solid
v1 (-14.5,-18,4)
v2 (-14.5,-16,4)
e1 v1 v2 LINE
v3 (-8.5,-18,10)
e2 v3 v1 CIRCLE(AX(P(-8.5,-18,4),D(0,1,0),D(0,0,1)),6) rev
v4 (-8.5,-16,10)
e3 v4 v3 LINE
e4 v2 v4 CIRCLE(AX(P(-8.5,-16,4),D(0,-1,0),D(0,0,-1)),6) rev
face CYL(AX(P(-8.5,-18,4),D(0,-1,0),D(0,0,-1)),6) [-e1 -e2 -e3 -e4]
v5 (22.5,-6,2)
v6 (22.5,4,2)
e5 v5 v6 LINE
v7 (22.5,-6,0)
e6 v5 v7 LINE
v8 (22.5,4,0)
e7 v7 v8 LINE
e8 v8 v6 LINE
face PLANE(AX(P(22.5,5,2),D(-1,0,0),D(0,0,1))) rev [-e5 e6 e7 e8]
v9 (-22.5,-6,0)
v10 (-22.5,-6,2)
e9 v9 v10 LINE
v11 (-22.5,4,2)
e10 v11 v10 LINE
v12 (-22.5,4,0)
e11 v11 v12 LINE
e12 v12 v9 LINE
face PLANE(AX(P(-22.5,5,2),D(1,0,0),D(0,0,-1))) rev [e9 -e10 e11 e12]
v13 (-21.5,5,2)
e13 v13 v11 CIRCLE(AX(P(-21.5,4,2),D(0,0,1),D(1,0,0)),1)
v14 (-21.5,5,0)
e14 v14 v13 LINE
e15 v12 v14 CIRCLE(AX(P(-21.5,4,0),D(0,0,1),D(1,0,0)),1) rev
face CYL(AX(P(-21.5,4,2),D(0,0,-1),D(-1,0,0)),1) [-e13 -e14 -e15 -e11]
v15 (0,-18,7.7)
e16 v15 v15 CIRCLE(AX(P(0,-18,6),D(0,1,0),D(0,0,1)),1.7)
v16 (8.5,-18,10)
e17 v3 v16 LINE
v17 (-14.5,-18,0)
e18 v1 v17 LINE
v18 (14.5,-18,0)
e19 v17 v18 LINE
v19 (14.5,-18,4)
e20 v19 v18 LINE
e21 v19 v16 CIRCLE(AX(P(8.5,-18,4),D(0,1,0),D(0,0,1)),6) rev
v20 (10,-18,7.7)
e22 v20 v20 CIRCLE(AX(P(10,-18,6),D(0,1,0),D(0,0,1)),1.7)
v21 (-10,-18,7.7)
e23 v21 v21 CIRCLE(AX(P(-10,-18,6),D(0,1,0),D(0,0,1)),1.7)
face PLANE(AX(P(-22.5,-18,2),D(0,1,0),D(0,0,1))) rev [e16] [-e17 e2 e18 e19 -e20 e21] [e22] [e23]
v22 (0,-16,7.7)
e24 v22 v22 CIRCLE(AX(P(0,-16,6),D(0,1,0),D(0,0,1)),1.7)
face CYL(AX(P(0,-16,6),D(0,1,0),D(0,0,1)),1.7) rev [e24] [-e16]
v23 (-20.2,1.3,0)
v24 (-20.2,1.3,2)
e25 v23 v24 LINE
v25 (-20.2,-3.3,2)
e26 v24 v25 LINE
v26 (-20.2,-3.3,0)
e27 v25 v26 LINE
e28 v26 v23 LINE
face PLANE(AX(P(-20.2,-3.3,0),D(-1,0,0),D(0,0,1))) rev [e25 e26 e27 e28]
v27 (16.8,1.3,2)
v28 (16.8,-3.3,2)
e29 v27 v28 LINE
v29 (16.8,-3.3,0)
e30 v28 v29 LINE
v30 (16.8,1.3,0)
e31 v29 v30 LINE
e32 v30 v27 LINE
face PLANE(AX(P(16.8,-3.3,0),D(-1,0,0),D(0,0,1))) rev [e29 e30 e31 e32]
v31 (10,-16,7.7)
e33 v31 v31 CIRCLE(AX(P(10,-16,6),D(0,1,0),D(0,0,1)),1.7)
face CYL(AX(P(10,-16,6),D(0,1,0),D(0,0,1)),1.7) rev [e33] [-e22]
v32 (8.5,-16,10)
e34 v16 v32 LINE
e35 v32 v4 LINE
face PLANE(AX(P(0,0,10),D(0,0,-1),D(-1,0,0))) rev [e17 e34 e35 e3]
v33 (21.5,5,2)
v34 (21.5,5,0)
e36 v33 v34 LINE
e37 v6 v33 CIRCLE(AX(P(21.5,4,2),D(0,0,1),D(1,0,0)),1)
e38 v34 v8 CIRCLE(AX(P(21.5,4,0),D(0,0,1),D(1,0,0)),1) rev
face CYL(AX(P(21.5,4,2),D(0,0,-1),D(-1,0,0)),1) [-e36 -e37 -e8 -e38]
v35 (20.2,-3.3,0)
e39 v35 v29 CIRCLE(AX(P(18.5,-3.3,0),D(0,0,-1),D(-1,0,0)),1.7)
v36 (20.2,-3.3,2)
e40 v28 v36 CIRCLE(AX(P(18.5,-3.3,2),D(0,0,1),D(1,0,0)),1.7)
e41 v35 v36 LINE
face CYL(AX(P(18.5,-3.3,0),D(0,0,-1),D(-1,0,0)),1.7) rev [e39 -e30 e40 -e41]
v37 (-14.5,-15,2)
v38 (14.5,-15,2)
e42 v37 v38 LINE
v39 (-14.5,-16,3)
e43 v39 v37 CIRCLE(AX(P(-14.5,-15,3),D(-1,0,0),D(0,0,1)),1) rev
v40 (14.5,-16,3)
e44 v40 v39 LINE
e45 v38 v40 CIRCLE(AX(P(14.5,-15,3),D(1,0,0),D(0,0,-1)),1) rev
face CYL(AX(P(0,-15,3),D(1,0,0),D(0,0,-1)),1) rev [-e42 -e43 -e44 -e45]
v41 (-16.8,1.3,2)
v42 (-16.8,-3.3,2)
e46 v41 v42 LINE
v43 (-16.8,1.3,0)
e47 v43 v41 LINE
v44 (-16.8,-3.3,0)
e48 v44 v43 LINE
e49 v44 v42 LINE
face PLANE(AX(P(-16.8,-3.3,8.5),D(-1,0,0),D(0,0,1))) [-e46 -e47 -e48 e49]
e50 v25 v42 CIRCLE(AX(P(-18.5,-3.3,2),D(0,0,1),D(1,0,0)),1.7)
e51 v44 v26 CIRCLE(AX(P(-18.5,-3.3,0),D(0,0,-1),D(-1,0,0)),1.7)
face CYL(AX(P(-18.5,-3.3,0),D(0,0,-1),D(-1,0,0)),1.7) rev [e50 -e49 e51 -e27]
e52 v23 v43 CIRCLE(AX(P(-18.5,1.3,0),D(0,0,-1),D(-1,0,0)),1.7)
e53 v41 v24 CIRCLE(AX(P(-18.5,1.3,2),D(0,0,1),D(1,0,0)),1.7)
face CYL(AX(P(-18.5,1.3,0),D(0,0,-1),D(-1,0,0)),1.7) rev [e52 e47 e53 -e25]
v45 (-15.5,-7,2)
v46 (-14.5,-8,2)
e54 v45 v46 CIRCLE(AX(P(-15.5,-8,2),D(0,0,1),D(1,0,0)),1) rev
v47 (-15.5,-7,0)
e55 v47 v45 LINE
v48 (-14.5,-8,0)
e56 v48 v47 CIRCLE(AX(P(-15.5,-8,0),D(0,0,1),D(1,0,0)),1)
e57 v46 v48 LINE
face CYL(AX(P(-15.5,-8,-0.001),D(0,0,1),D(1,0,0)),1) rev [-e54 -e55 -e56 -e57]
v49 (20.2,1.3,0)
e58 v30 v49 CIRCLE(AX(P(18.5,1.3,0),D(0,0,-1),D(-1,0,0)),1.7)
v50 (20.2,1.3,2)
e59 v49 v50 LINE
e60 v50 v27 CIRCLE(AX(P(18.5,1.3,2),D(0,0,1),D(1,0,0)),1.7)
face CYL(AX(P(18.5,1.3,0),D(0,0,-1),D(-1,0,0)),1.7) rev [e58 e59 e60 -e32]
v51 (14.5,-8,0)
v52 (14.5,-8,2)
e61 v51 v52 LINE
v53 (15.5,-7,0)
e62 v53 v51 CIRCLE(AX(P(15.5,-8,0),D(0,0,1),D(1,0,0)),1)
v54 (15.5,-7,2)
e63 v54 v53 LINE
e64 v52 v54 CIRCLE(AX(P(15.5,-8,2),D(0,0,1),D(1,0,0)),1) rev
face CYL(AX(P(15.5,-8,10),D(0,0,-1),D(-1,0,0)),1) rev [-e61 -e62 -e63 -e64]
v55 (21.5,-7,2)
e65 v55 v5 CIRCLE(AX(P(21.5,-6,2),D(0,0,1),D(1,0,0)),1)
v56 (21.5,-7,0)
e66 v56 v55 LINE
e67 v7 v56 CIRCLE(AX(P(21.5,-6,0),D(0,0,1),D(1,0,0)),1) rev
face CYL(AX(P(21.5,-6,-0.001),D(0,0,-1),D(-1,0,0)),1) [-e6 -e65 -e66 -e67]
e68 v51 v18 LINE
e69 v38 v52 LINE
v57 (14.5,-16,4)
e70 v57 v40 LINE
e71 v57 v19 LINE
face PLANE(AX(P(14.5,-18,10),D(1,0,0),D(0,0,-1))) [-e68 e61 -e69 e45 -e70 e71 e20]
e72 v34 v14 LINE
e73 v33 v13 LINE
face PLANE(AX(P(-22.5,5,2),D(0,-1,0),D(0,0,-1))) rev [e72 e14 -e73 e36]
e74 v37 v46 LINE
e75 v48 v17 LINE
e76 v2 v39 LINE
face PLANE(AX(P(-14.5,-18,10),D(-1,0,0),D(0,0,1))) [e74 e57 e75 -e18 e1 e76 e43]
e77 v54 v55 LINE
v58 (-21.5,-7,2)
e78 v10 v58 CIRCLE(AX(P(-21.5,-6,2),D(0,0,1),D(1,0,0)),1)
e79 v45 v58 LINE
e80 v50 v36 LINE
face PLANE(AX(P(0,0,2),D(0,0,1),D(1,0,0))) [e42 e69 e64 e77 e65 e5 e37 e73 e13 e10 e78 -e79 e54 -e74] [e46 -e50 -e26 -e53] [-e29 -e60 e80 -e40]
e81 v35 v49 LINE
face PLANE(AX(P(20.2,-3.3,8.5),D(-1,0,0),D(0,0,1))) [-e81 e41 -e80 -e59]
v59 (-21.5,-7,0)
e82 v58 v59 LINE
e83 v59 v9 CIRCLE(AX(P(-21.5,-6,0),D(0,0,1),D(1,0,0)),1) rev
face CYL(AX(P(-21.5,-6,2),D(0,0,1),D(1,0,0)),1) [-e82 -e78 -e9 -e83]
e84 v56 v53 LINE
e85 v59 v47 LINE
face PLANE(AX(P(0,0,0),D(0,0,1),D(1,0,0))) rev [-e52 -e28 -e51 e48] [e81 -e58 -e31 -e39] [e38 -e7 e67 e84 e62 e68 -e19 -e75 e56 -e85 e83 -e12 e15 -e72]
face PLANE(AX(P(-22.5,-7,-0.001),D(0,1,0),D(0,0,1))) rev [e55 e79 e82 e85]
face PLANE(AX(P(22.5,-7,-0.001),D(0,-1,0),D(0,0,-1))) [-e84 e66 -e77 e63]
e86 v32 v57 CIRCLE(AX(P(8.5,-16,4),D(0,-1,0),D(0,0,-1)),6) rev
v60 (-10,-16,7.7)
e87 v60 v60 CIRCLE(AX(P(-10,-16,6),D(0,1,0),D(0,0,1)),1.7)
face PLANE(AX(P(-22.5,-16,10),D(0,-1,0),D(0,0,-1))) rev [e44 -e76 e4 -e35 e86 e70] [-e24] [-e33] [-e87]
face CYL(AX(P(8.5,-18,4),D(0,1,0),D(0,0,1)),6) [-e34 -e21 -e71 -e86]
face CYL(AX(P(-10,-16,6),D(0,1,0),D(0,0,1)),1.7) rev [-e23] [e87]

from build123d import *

# Parameters (mm, degrees)
SKETCH_1_W             = 45
SKETCH_1_H             = 10
EXTRUDE_1_DEPTH        = 2
SKETCH_2_W             = 45
SKETCH_2_H             = 23
EXTRUDE_2_DEPTH        = 2
SKETCH_4_W             = 45
SKETCH_4_H             = 2
EXTRUDE_3_DEPTH        = 10
PATTERN_LINEAR_1_COUNT = 3
PATTERN_LINEAR_1_PITCH = 10
HOLE_WIZARD_M3_2_DEPTH = 2
SKETCH_9_W             = 8
SKETCH_9_H             = 2
CUT_EXTRUDE_1_DEPTH    = 30.904013109
FILLET_1_R             = 6
FILLET_3_R             = 1
CUT_EXTRUDE_2_REACH    = 31.904
SKETCH_11_W            = 8
SKETCH_11_H            = 11
FILLET_5_R             = 1


# Read off the part's stored shape, not the designer's step: M3 间隙槽口2
with BuildPart() as part:
    # 草图1 → 凸台-拉伸1 (new body)
    with BuildSketch(Plane.XY):
        Rectangle(SKETCH_1_W, SKETCH_1_H)
    extrude(amount=EXTRUDE_1_DEPTH)

    # 草图2 → 凸台-拉伸2 (add)
    with BuildSketch(Plane.XY):
        with Locations((0, -6.5)):
            Rectangle(SKETCH_2_W, SKETCH_2_H)
    extrude(amount=EXTRUDE_2_DEPTH)

    # 草图4 → 凸台-拉伸3 (add)
    with BuildSketch(Plane.XY):
        with Locations((0, -17)):
            Rectangle(SKETCH_4_W, SKETCH_4_H)
    extrude(amount=EXTRUDE_3_DEPTH)

    # 草图6 → M3 间隙孔1 (revolve, cut)
    with BuildSketch(Plane(origin=(-10, -16, 6), x_dir=(0, 0, 1), z_dir=(1, 0, 0))):
        Polygon((0, 0), (0, 9.521463052), (1.7, 8.5), (1.7, 0), align=None)
    hole_wizard_m3_1 = revolve(axis=Axis((-10, -9.65, 6), (0, -1, 0)), mode=Mode.SUBTRACT)

    # 阵列(线性)1: M3 间隙孔1 ×3
    with Locations(*[(i * PATTERN_LINEAR_1_PITCH, 0, 0) for i in range(1, PATTERN_LINEAR_1_COUNT)]):
        add(hole_wizard_m3_1, mode=Mode.SUBTRACT)

    # M3 间隙槽口2 outline → M3 间隙槽口2 (cut)
    with BuildSketch(Plane.XY):
        with BuildLine():
            ThreePointArc((20.2, 1.3), (18.5, 3), (16.8, 1.3))
            Line((16.8, 1.3), (16.8, -3.3))
            ThreePointArc((16.8, -3.3), (18.5, -5), (20.2, -3.3))
            Line((20.2, -3.3), (20.2, 1.3))
        make_face()
        with BuildLine():
            ThreePointArc((-16.8, 1.3), (-18.5, 3), (-20.2, 1.3))
            Line((-20.2, 1.3), (-20.2, -3.3))
            ThreePointArc((-20.2, -3.3), (-18.5, -5), (-16.8, -3.3))
            Line((-16.8, -3.3), (-16.8, 1.3))
        make_face()
    extrude(amount=HOLE_WIZARD_M3_2_DEPTH, mode=Mode.SUBTRACT)

    # 草图9 → 切除-拉伸1 (cut, through all)
    with BuildSketch(Plane.XY.offset(2)):
        with Locations((-18.5, -17)):
            Rectangle(SKETCH_9_W, SKETCH_9_H)
        with Locations((18.5, -17)):
            Rectangle(SKETCH_9_W, SKETCH_9_H)
    extrude(amount=CUT_EXTRUDE_1_DEPTH, mode=Mode.SUBTRACT)

    # 圆角1
    fillet_1_edges = [part.edges().sort_by_distance(p)[0] for p in [
        (-14.5, -17, 10),
        (14.5, -17, 10),
    ]]
    fillet(fillet_1_edges, radius=FILLET_1_R)

    # 圆角3
    fillet_3_edges = [part.edges().sort_by_distance(p)[0] for p in [
        (0, -16, 2),
    ]]
    fillet(fillet_3_edges, radius=FILLET_3_R)

    # 草图11 → 切除-拉伸2 (cut, up to next)
    with BuildSketch(Plane.XY.offset(2), mode=Mode.PRIVATE) as cut_extrude_2_sk1:
        with Locations((-18.5, -12.5)):
            Rectangle(SKETCH_11_W, SKETCH_11_H)
    cut_extrude_2_tool1 = extrude(cut_extrude_2_sk1.sketch, amount=-CUT_EXTRUDE_2_REACH, mode=Mode.PRIVATE) & part.part
    cut_extrude_2 = cut_extrude_2_tool1.solids().sort_by_distance((-18.5, -12.5, 2))[0]
    add(cut_extrude_2, mode=Mode.SUBTRACT)

    # 镜向1: 切除-拉伸2 across plane
    add(cut_extrude_2.mirror(Plane(origin=(0, 0, 0), x_dir=(0, 0, 1), z_dir=(1, 0, 0))), mode=Mode.SUBTRACT)

    # 圆角5
    fillet_5_edges = [part.edges().sort_by_distance(p)[0] for p in [
        (-22.5, -7, 1),
        (-14.5, -7, 1),
        (22.5, -7, 1),
        (14.5, -7, 1),
        (-22.5, 5, 1),
        (22.5, 5, 1),
    ]]
    fillet(fillet_5_edges, radius=FILLET_5_R)


solid = part.part
